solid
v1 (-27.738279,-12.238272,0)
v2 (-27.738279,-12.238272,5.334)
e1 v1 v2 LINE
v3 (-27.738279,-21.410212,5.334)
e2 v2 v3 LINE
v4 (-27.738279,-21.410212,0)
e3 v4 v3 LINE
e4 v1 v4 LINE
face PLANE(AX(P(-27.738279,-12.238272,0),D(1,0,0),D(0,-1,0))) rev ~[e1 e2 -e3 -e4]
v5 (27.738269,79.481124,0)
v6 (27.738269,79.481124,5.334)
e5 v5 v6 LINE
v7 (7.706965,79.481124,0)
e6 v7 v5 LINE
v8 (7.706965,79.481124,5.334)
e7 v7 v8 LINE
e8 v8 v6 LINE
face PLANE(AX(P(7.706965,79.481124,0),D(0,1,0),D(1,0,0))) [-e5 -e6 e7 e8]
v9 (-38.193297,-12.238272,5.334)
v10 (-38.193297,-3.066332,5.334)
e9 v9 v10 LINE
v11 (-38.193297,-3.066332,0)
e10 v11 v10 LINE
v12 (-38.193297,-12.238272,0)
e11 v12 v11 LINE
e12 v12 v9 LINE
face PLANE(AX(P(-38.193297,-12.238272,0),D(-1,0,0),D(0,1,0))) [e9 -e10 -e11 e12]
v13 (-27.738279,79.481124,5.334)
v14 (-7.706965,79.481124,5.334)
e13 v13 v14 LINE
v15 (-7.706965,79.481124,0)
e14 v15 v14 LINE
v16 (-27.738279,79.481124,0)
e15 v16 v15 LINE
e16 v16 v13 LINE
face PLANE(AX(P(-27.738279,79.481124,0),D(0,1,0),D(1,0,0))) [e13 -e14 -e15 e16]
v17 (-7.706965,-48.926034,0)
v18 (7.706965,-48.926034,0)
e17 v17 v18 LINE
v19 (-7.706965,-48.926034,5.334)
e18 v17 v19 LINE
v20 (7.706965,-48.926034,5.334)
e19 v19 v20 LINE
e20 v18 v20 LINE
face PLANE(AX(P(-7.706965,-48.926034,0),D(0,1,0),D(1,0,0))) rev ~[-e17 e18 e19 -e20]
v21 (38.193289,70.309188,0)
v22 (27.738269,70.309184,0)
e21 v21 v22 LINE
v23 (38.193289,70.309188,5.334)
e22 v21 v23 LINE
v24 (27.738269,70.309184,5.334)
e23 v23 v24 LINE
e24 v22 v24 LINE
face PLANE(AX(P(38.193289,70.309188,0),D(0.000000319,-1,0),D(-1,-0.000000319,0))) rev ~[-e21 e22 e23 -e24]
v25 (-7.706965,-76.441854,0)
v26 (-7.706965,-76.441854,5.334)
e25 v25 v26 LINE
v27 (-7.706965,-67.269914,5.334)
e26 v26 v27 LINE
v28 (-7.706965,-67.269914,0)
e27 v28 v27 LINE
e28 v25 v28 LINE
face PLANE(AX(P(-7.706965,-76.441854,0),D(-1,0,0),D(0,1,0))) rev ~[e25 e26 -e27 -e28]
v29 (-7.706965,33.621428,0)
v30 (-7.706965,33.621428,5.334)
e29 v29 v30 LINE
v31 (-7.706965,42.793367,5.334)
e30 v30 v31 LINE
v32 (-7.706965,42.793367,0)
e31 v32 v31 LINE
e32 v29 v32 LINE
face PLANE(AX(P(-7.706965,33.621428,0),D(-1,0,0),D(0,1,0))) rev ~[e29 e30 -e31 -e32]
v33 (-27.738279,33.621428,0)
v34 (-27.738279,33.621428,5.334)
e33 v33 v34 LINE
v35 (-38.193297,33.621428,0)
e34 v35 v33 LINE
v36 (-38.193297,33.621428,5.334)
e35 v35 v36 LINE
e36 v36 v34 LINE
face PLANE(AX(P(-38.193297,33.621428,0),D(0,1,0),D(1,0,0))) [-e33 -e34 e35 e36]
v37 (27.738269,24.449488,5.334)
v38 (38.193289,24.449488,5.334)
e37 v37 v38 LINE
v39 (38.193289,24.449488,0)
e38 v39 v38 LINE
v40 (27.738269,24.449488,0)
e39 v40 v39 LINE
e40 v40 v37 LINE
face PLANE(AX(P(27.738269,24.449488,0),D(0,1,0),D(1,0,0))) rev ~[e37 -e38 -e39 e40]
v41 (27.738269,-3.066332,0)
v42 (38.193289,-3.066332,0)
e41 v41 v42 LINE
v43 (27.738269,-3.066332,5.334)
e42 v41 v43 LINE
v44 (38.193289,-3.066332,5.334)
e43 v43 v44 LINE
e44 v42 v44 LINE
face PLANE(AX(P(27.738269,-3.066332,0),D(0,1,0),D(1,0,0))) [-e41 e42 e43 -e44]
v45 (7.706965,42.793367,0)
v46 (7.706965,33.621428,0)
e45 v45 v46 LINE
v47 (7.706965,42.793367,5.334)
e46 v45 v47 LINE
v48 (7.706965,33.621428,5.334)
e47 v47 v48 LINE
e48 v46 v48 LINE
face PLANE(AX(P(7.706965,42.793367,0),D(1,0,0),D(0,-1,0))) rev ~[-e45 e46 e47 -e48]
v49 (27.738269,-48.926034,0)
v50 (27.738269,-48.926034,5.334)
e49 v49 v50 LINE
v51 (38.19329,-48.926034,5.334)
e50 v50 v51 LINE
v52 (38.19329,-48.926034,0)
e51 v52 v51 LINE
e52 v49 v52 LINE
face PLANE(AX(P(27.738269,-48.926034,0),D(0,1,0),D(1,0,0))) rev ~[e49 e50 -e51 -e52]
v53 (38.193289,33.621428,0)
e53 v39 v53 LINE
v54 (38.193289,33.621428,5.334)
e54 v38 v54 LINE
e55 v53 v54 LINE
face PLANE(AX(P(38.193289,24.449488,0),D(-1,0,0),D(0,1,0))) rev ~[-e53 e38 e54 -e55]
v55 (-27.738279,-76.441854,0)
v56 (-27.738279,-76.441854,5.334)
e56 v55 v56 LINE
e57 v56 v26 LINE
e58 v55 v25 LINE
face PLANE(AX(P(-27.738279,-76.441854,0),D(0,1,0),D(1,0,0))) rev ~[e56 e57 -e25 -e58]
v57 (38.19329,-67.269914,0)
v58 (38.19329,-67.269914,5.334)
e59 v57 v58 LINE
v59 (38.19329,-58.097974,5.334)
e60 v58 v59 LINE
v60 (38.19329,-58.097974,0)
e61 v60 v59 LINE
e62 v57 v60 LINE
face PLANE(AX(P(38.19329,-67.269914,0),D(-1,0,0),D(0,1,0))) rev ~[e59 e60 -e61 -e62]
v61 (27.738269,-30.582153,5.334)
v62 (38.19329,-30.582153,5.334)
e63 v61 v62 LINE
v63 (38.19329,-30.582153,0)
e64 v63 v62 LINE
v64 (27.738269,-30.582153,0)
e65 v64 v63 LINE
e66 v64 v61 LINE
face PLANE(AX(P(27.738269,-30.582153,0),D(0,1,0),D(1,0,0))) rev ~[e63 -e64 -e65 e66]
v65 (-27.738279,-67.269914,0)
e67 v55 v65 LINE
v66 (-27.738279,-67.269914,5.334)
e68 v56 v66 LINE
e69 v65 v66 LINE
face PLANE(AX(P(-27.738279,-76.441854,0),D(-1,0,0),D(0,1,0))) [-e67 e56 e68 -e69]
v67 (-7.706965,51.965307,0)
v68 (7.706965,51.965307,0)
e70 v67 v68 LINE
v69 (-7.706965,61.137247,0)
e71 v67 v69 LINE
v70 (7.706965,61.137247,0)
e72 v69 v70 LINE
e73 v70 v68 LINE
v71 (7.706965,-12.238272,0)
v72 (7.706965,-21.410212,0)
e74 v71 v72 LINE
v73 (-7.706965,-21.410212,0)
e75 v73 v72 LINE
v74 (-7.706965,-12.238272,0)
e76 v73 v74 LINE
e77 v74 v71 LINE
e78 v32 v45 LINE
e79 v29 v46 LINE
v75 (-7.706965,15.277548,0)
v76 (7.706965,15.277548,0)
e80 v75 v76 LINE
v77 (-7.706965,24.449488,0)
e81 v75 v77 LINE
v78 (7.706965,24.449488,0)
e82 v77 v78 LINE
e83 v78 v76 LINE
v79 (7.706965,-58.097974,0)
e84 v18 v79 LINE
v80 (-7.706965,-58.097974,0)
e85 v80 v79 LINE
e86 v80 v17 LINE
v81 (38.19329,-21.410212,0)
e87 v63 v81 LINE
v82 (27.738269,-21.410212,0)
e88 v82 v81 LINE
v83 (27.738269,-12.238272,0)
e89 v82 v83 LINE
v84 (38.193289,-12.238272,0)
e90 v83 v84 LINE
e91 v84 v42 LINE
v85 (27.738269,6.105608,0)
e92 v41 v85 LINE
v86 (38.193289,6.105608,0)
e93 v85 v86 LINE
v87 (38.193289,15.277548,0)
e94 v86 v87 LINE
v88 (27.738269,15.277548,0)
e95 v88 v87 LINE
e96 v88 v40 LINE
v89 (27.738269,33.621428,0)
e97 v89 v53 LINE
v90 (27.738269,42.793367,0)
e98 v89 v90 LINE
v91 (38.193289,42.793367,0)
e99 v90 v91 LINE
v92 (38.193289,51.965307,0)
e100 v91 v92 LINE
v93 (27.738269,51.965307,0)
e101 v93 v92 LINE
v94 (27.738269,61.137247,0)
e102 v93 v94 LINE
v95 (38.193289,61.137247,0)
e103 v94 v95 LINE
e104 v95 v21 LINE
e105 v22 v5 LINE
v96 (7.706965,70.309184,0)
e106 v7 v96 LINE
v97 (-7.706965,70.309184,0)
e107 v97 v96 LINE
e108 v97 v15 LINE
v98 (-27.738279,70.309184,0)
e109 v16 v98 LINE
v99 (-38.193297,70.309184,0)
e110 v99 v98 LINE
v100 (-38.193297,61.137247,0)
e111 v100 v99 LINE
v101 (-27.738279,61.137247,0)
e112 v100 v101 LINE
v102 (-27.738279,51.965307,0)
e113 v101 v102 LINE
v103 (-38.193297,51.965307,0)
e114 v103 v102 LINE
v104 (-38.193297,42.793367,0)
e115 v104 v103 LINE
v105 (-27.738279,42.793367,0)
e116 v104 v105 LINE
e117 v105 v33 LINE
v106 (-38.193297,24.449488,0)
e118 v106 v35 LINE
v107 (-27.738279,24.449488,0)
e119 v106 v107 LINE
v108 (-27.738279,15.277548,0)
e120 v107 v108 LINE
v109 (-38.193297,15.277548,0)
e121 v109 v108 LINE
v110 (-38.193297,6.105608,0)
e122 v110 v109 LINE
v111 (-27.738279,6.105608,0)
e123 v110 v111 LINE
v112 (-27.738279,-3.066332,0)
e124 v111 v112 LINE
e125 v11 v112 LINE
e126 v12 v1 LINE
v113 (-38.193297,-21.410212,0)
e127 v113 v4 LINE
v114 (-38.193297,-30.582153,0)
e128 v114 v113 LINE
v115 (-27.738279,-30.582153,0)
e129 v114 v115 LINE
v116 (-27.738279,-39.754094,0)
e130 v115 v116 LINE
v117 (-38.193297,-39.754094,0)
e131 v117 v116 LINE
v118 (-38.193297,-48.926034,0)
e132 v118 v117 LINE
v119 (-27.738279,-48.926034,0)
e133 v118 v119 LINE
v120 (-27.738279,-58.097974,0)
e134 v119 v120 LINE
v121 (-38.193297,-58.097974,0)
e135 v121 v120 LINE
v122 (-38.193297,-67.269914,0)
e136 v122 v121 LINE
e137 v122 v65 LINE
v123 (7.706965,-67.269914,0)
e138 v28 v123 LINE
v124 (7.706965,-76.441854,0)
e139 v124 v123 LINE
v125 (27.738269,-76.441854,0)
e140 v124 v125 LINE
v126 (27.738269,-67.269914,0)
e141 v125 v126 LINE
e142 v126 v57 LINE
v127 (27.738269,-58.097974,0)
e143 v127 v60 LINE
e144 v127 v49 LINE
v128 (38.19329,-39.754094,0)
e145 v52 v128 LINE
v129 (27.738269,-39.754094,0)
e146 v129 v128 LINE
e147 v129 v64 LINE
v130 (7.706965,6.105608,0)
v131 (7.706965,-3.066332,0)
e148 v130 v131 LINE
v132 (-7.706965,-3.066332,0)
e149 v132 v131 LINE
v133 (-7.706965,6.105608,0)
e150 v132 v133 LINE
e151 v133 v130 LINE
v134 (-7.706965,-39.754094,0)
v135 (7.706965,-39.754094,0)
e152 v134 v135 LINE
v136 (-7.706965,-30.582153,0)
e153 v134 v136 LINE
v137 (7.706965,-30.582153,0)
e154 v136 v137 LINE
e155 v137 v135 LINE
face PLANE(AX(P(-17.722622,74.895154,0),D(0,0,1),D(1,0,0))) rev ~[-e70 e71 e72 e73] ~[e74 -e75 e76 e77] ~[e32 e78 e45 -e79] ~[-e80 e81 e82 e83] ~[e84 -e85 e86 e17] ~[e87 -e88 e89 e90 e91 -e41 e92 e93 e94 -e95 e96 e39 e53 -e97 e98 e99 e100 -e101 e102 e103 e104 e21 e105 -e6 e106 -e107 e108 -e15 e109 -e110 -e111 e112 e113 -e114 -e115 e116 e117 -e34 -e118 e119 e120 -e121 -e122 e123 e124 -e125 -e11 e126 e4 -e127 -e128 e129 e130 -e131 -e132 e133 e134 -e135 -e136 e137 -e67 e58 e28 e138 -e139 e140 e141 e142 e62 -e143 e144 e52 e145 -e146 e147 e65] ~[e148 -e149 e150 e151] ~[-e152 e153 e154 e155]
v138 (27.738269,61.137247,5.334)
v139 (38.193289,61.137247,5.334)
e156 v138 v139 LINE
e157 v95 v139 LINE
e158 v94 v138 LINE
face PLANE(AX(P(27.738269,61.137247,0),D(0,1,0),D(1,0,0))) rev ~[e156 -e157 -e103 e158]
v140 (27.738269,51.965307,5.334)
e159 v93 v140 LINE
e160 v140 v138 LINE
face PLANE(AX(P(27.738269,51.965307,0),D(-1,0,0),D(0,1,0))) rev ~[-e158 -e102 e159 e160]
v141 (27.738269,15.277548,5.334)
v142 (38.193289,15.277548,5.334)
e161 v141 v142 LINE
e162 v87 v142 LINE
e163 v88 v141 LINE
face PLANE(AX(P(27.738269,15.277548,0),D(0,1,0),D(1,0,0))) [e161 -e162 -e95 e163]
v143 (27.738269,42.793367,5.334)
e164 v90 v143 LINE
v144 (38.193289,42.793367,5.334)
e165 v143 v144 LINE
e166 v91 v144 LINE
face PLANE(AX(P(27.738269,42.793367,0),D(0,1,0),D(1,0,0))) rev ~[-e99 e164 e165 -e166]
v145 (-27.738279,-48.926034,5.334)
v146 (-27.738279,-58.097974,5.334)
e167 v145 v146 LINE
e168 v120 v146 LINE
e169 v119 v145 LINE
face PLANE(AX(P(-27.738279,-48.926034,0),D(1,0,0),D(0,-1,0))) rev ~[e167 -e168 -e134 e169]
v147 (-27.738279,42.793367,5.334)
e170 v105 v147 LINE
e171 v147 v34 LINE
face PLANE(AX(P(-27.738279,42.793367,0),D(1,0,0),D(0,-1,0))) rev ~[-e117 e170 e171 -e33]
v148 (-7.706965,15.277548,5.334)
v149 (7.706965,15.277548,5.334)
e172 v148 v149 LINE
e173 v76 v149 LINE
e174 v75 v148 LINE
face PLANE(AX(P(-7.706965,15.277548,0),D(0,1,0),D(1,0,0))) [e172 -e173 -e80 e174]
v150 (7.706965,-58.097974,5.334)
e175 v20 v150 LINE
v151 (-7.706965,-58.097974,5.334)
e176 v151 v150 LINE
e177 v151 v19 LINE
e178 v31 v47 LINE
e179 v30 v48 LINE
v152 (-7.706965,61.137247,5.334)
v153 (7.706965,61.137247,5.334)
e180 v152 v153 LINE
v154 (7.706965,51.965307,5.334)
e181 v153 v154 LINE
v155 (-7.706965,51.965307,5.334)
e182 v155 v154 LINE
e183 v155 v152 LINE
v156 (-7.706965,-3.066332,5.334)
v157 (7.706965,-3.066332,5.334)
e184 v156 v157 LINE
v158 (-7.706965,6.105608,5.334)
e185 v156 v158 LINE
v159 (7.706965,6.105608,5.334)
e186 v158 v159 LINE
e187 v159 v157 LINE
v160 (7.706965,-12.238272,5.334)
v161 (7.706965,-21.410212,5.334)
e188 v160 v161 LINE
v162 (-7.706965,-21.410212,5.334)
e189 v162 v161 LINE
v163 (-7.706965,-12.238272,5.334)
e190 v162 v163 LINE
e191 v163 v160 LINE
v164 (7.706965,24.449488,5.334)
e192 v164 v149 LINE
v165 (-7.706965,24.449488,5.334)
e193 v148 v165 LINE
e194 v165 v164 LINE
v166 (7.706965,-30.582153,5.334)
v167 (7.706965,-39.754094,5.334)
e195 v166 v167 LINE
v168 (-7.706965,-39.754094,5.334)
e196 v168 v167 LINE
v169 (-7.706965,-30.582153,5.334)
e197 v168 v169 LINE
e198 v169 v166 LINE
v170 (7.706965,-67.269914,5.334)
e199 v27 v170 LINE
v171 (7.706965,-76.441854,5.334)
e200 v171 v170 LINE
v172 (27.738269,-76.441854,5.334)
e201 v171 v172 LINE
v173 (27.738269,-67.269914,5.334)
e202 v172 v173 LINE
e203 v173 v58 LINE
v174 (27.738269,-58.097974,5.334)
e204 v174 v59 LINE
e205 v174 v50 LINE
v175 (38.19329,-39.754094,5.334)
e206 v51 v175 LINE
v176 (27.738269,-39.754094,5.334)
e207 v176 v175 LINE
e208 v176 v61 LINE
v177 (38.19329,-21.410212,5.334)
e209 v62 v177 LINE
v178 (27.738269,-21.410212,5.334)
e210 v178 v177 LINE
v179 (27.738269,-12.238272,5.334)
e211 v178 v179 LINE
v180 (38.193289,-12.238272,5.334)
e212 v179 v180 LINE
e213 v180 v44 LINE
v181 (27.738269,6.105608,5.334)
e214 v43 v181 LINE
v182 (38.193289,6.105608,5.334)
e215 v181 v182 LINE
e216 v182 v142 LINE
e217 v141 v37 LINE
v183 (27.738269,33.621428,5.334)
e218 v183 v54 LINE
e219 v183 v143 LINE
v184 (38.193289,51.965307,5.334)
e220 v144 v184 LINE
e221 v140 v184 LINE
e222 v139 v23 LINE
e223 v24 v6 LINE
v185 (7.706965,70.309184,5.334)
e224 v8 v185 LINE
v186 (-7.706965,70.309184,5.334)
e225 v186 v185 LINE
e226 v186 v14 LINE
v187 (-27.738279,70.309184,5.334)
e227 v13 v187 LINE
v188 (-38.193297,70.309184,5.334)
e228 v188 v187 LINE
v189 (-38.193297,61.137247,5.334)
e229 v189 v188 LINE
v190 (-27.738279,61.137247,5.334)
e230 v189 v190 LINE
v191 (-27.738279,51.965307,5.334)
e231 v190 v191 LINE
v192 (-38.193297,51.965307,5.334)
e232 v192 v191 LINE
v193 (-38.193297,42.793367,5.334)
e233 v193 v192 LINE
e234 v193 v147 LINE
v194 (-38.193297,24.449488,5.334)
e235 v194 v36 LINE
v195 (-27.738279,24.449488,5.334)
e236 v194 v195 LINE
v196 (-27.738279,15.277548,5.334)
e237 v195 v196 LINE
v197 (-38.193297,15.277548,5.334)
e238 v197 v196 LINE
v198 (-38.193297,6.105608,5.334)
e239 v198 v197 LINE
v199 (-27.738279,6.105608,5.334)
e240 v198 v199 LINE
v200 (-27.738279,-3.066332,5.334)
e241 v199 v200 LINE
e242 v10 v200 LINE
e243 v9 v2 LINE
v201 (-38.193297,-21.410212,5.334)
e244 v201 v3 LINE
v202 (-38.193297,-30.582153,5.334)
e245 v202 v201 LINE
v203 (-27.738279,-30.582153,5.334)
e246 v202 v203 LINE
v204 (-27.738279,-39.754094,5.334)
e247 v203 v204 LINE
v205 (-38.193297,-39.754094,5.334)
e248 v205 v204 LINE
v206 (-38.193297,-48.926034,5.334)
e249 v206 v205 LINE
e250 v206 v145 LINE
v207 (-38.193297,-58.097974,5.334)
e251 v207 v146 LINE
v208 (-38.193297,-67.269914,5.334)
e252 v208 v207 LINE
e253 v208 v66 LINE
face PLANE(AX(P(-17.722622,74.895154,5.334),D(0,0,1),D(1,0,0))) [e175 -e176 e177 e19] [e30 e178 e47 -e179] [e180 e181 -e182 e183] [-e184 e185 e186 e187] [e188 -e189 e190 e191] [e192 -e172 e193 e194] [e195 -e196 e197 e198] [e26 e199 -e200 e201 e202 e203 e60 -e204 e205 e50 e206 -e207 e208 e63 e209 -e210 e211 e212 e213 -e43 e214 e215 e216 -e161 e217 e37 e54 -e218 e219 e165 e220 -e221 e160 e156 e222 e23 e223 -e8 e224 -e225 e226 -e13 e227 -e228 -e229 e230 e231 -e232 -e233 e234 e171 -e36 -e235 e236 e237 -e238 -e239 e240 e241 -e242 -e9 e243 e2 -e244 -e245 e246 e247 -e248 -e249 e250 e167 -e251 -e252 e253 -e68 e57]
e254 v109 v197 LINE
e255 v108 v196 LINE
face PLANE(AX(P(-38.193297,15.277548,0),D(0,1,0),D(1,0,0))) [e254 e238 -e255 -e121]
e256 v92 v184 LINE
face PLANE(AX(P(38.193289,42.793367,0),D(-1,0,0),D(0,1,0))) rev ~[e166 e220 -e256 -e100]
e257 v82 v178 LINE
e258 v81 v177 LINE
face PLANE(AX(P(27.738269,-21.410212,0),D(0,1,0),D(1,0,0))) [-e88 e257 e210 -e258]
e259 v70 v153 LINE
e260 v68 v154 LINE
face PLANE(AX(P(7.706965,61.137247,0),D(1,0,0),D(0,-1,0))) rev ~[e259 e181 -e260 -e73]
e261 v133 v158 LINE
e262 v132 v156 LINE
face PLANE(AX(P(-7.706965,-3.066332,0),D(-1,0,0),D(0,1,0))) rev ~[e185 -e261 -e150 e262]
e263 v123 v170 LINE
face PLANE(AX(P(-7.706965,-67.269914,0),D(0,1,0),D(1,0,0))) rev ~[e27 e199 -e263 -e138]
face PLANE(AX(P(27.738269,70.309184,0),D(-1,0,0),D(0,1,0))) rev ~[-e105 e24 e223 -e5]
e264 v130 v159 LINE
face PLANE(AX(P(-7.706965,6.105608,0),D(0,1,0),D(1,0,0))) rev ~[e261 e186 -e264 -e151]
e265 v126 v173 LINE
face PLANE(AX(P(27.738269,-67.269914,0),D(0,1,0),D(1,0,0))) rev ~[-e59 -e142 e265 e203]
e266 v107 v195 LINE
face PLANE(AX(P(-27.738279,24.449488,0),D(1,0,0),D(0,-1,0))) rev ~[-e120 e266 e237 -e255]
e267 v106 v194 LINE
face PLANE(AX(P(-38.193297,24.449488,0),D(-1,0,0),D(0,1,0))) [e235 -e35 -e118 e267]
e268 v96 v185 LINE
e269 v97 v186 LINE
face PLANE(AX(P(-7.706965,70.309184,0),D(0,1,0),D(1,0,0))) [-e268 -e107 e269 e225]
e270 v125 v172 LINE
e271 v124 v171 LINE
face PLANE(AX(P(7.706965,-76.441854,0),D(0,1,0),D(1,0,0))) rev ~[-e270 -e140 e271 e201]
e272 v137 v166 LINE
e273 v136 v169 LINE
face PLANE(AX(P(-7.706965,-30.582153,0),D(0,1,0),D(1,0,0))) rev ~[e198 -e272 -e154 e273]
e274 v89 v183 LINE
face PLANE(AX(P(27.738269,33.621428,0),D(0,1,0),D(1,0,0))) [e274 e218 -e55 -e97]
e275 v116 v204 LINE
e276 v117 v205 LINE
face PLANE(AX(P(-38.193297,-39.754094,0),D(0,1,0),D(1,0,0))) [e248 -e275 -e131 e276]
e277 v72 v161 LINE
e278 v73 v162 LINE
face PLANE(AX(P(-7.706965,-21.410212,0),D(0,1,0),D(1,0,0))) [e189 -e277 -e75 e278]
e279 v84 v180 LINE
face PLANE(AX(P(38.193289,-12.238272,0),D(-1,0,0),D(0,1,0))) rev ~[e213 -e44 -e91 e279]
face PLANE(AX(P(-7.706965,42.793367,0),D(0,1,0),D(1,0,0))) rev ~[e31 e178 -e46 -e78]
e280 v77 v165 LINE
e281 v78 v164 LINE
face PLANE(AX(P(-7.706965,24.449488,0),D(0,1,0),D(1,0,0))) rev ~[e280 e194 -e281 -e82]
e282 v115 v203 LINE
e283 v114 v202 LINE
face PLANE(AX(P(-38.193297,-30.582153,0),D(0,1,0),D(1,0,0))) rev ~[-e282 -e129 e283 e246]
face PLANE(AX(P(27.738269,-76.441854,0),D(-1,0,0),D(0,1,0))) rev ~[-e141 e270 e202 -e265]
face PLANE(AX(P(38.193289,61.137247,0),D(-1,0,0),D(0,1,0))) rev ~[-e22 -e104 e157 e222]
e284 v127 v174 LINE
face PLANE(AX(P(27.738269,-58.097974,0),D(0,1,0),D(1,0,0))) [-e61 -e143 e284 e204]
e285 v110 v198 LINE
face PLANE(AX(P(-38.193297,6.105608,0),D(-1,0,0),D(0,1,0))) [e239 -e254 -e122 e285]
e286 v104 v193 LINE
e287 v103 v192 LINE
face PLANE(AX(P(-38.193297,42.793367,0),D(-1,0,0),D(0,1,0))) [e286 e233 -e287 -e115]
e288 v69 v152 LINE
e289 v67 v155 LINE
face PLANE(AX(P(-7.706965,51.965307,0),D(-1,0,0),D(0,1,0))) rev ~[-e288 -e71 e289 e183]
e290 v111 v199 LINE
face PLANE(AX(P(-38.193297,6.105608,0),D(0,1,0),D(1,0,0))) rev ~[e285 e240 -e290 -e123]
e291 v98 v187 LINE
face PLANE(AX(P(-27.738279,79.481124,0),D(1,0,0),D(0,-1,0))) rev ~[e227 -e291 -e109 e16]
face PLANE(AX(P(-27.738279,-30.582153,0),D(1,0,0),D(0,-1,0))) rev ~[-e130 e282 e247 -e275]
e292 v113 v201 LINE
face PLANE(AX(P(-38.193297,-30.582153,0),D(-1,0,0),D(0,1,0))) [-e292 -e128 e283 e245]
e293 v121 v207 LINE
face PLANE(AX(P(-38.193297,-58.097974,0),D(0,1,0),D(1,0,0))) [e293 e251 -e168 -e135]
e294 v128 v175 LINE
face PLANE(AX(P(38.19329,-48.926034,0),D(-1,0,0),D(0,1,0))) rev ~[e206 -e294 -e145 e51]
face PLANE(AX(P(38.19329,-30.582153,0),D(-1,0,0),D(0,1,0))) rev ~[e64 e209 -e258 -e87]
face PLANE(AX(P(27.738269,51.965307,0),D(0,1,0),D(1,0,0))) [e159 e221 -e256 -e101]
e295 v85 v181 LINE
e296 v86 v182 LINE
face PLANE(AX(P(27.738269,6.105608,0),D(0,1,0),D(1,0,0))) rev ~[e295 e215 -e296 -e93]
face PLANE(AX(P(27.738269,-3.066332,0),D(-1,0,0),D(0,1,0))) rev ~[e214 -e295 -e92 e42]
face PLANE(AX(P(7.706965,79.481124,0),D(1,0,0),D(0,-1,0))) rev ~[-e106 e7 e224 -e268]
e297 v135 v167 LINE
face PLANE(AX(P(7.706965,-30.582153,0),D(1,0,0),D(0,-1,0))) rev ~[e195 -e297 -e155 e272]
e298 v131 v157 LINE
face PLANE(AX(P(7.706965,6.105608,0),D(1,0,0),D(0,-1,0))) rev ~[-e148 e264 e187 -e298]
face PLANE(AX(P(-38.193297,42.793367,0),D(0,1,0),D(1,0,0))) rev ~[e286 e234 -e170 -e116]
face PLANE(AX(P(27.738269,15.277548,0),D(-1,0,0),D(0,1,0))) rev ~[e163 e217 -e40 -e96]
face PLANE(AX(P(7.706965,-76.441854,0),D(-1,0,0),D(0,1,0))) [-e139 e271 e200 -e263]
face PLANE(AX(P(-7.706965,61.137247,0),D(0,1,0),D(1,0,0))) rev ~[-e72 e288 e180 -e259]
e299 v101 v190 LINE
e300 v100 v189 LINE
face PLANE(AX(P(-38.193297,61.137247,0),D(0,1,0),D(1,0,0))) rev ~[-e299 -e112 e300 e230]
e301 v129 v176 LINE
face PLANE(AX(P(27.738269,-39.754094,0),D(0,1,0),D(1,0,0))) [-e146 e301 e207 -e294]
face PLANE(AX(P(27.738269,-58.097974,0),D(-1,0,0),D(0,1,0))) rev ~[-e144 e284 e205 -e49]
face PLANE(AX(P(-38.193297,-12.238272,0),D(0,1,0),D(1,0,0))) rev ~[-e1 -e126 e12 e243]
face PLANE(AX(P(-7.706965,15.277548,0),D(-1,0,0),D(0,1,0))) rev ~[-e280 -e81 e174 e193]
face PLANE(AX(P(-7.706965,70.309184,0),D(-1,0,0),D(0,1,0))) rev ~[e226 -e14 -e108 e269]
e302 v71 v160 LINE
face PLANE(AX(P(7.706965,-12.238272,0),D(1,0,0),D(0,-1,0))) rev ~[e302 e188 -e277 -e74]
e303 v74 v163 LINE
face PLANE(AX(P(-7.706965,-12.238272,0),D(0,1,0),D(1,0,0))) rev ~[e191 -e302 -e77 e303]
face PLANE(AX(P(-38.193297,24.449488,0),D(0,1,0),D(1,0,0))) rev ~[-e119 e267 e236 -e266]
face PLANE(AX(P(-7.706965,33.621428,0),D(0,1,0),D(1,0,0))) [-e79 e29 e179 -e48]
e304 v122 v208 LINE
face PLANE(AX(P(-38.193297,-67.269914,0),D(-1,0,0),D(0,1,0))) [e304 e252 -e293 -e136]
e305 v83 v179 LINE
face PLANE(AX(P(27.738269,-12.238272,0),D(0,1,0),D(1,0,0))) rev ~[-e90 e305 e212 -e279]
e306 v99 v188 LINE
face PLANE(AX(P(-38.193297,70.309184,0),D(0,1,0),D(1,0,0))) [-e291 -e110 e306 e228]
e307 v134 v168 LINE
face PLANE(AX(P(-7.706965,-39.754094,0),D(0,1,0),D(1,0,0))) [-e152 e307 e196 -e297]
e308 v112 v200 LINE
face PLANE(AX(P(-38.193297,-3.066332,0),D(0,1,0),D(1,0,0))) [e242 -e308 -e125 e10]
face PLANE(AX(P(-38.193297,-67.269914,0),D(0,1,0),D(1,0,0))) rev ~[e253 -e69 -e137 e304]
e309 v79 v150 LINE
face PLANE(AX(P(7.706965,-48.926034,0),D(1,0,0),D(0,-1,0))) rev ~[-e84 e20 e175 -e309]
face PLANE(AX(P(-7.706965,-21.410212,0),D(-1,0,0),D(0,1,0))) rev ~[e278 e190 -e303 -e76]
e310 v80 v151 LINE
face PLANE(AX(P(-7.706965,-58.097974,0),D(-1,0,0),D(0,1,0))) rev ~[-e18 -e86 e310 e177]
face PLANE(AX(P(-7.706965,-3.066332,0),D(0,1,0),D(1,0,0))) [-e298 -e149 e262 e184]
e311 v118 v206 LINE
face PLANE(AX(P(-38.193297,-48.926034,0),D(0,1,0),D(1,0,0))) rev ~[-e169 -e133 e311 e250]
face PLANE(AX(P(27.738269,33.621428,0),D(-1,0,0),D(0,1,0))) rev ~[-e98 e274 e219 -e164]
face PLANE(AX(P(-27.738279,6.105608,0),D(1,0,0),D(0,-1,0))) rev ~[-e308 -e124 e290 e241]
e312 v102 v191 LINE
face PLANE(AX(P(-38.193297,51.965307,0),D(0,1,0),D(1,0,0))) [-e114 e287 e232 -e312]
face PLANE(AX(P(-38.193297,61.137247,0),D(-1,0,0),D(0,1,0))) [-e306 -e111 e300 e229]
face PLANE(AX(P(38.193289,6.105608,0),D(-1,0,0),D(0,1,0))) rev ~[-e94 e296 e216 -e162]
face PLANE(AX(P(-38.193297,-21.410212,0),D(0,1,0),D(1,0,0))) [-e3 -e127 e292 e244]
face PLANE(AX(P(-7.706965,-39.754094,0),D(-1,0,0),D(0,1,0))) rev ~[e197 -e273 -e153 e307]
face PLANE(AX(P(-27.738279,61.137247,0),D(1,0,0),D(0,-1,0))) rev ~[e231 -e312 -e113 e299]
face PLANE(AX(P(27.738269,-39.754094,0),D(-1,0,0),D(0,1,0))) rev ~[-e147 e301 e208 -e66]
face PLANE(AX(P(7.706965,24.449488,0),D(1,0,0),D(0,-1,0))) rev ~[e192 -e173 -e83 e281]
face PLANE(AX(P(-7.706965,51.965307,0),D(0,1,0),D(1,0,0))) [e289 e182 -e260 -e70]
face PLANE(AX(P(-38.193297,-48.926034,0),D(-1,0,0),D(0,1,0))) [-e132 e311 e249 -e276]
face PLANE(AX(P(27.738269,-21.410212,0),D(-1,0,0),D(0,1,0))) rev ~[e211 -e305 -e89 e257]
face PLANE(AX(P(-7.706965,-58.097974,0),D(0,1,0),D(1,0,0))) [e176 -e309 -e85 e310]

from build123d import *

# Parameters (mm, degrees)
F0_W     = 20.0313134119
F0_H     = 9.17194
F0_H_2   = 9.1719370473
F0_H_3   = 9.1719407726
F0_H_4   = 9.1719385237
F0_H_5   = 9.1719403863
F0_H_6   = 9.1719399947
F0_H_7   = 9.1719411589
F0_H_8   = 9.1719400741
F0_W_2   = 20.0313036
F0_W_3   = 15.4139306396
F0_W_4   = 10.4550179094
F0_W_5   = 10.4550202707
F0_W_6   = 10.455021
F1_DEPTH = 5.334


# Not quite as in the source:
# - ends of sketch curves that miss each other by under 0.0002 mm in the source are joined


with BuildPart() as f1:
    # F0 (on Top) → F1 (new body)
    with BuildSketch(Plane.XY):
        with Locations((-17.7226220258, 74.8951544916)):
            Rectangle(F0_W, F0_H)
        with Locations((-17.7226220258, 65.723215968)):
            Rectangle(F0_W, F0_H_2)
        with Locations((-17.7226220258, 47.3793366717)):
            Rectangle(F0_W, F0_H)
        with Locations((-17.7226220258, 56.551277058)):
            Rectangle(F0_W, F0_H_3)
        with Locations((-17.7226220258, 38.2073974099)):
            Rectangle(F0_W, F0_H_4)
        with Locations((-17.7226220258, 29.0354579549)):
            Rectangle(F0_W, F0_H_5)
        with Locations((-17.7226220258, -16.824242307)):
            Rectangle(F0_W, F0_H)
        with Locations((-17.7226220258, 1.5196376903)):
            Rectangle(F0_W, F0_H_6)
        with Locations((-17.7226220258, -35.1681232728)):
            Rectangle(F0_W, F0_H_7)
        with Locations((-17.7226220258, 10.6915776877)):
            Rectangle(F0_W, F0_H)
        with Locations((-17.7226220258, -7.652302307)):
            Rectangle(F0_W, F0_H)
        with Locations((-17.7226220258, -53.5120038522)):
            Rectangle(F0_W, F0_H)
        with Locations((-17.7226220258, -25.9961825002)):
            Rectangle(F0_W, F0_H_5)
        with Locations((-17.7226220258, -44.3400638522)):
            Rectangle(F0_W, F0_H)
        with Locations((-17.7226220258, -62.6839438522)):
            Rectangle(F0_W, F0_H)
        with Locations((-17.7226220258, 19.8635177247)):
            Rectangle(F0_W, F0_H_8)
        with Locations((17.7226171198, 29.0354579549)):
            Rectangle(F0_W_2, F0_H_5)
        with Locations((17.7226171198, 47.3793366717)):
            Rectangle(F0_W_2, F0_H)
        with Locations((17.7226171198, -62.6839438522)):
            Rectangle(F0_W_2, F0_H)
        with Locations((17.7226171198, 19.8635177247)):
            Rectangle(F0_W_2, F0_H_8)
        with Locations((17.7226171198, -53.5120038522)):
            Rectangle(F0_W_2, F0_H)
        with Locations((17.7226171198, -25.9961825002)):
            Rectangle(F0_W_2, F0_H_5)
        with Locations((17.7226171198, -7.652302307)):
            Rectangle(F0_W_2, F0_H)
        with Locations((17.7226171198, 38.2073974099)):
            Rectangle(F0_W_2, F0_H_4)
        with Locations((17.7226171198, -35.1681232728)):
            Rectangle(F0_W_2, F0_H_7)
        with Locations((17.7226171198, 10.6915776877)):
            Rectangle(F0_W_2, F0_H)
        with Locations((17.7226171198, -44.3400638522)):
            Rectangle(F0_W_2, F0_H)
        with Locations((17.7226171198, 65.723215968)):
            Rectangle(F0_W_2, F0_H_2)
        with Locations((17.7226171198, 74.8951544916)):
            Rectangle(F0_W_2, F0_H)
        with Locations((17.7226171198, 56.551277058)):
            Rectangle(F0_W_2, F0_H_3)
        with Locations((17.7226171198, -16.824242307)):
            Rectangle(F0_W_2, F0_H)
        with Locations((17.7226171198, 1.5196376903)):
            Rectangle(F0_W_2, F0_H_6)
        Polygon((27.7382689198, 70.3091844916), (27.7382689198, 61.1372474443), (38.1932891905, 61.1372474443), (38.1932891905, 70.3091878306), align=None)
        with Locations((0, 65.723215968)):
            Rectangle(F0_W_3, F0_H_2)
        with Locations((-32.9657876864, 65.723215968)):
            Rectangle(F0_W_4, F0_H_2)
        with Locations((-32.9657876864, 47.3793366717)):
            Rectangle(F0_W_4, F0_H)
        with Locations((0, 47.3793366717)):
            Rectangle(F0_W_3, F0_H)
        with Locations((32.9657790552, 47.3793366717)):
            Rectangle(F0_W_5, F0_H)
        with Locations((32.9657790552, 29.0354579549)):
            Rectangle(F0_W_5, F0_H_5)
        with Locations((0, 29.0354579549)):
            Rectangle(F0_W_3, F0_H_5)
        with Locations((-32.9657876864, 29.0354579549)):
            Rectangle(F0_W_4, F0_H_5)
        with Locations((-32.9657876864, 10.6915776877)):
            Rectangle(F0_W_4, F0_H)
        with Locations((32.9657790552, 10.6915776877)):
            Rectangle(F0_W_5, F0_H)
        with Locations((32.9657790552, -7.652302307)):
            Rectangle(F0_W_5, F0_H)
        with Locations((-32.9657876864, -7.652302307)):
            Rectangle(F0_W_4, F0_H)
        with Locations((-32.9657876864, -25.9961825002)):
            Rectangle(F0_W_4, F0_H_5)
        with Locations((0, 10.6915776877)):
            Rectangle(F0_W_3, F0_H)
        with Locations((0, -7.652302307)):
            Rectangle(F0_W_3, F0_H)
        with Locations((0, -25.9961825002)):
            Rectangle(F0_W_3, F0_H_5)
        with Locations((0, -44.3400638522)):
            Rectangle(F0_W_3, F0_H)
        with Locations((32.9657794198, -25.9961825002)):
            Rectangle(F0_W_6, F0_H_5)
        with Locations((32.9657794198, -44.3400638522)):
            Rectangle(F0_W_6, F0_H)
        with Locations((-32.9657876864, -44.3400638522)):
            Rectangle(F0_W_4, F0_H)
        with Locations((-32.9657876864, -62.6839438522)):
            Rectangle(F0_W_4, F0_H)
        with Locations((0, -62.6839438522)):
            Rectangle(F0_W_3, F0_H)
        with Locations((32.9657794198, -62.6839438522)):
            Rectangle(F0_W_6, F0_H)
        with Locations((-17.7226220258, -71.8558840454)):
            Rectangle(F0_W, F0_H_5)
        with Locations((17.7226171198, -71.8558840454)):
            Rectangle(F0_W_2, F0_H_5)
    extrude(amount=F1_DEPTH)


solid = f1.part
